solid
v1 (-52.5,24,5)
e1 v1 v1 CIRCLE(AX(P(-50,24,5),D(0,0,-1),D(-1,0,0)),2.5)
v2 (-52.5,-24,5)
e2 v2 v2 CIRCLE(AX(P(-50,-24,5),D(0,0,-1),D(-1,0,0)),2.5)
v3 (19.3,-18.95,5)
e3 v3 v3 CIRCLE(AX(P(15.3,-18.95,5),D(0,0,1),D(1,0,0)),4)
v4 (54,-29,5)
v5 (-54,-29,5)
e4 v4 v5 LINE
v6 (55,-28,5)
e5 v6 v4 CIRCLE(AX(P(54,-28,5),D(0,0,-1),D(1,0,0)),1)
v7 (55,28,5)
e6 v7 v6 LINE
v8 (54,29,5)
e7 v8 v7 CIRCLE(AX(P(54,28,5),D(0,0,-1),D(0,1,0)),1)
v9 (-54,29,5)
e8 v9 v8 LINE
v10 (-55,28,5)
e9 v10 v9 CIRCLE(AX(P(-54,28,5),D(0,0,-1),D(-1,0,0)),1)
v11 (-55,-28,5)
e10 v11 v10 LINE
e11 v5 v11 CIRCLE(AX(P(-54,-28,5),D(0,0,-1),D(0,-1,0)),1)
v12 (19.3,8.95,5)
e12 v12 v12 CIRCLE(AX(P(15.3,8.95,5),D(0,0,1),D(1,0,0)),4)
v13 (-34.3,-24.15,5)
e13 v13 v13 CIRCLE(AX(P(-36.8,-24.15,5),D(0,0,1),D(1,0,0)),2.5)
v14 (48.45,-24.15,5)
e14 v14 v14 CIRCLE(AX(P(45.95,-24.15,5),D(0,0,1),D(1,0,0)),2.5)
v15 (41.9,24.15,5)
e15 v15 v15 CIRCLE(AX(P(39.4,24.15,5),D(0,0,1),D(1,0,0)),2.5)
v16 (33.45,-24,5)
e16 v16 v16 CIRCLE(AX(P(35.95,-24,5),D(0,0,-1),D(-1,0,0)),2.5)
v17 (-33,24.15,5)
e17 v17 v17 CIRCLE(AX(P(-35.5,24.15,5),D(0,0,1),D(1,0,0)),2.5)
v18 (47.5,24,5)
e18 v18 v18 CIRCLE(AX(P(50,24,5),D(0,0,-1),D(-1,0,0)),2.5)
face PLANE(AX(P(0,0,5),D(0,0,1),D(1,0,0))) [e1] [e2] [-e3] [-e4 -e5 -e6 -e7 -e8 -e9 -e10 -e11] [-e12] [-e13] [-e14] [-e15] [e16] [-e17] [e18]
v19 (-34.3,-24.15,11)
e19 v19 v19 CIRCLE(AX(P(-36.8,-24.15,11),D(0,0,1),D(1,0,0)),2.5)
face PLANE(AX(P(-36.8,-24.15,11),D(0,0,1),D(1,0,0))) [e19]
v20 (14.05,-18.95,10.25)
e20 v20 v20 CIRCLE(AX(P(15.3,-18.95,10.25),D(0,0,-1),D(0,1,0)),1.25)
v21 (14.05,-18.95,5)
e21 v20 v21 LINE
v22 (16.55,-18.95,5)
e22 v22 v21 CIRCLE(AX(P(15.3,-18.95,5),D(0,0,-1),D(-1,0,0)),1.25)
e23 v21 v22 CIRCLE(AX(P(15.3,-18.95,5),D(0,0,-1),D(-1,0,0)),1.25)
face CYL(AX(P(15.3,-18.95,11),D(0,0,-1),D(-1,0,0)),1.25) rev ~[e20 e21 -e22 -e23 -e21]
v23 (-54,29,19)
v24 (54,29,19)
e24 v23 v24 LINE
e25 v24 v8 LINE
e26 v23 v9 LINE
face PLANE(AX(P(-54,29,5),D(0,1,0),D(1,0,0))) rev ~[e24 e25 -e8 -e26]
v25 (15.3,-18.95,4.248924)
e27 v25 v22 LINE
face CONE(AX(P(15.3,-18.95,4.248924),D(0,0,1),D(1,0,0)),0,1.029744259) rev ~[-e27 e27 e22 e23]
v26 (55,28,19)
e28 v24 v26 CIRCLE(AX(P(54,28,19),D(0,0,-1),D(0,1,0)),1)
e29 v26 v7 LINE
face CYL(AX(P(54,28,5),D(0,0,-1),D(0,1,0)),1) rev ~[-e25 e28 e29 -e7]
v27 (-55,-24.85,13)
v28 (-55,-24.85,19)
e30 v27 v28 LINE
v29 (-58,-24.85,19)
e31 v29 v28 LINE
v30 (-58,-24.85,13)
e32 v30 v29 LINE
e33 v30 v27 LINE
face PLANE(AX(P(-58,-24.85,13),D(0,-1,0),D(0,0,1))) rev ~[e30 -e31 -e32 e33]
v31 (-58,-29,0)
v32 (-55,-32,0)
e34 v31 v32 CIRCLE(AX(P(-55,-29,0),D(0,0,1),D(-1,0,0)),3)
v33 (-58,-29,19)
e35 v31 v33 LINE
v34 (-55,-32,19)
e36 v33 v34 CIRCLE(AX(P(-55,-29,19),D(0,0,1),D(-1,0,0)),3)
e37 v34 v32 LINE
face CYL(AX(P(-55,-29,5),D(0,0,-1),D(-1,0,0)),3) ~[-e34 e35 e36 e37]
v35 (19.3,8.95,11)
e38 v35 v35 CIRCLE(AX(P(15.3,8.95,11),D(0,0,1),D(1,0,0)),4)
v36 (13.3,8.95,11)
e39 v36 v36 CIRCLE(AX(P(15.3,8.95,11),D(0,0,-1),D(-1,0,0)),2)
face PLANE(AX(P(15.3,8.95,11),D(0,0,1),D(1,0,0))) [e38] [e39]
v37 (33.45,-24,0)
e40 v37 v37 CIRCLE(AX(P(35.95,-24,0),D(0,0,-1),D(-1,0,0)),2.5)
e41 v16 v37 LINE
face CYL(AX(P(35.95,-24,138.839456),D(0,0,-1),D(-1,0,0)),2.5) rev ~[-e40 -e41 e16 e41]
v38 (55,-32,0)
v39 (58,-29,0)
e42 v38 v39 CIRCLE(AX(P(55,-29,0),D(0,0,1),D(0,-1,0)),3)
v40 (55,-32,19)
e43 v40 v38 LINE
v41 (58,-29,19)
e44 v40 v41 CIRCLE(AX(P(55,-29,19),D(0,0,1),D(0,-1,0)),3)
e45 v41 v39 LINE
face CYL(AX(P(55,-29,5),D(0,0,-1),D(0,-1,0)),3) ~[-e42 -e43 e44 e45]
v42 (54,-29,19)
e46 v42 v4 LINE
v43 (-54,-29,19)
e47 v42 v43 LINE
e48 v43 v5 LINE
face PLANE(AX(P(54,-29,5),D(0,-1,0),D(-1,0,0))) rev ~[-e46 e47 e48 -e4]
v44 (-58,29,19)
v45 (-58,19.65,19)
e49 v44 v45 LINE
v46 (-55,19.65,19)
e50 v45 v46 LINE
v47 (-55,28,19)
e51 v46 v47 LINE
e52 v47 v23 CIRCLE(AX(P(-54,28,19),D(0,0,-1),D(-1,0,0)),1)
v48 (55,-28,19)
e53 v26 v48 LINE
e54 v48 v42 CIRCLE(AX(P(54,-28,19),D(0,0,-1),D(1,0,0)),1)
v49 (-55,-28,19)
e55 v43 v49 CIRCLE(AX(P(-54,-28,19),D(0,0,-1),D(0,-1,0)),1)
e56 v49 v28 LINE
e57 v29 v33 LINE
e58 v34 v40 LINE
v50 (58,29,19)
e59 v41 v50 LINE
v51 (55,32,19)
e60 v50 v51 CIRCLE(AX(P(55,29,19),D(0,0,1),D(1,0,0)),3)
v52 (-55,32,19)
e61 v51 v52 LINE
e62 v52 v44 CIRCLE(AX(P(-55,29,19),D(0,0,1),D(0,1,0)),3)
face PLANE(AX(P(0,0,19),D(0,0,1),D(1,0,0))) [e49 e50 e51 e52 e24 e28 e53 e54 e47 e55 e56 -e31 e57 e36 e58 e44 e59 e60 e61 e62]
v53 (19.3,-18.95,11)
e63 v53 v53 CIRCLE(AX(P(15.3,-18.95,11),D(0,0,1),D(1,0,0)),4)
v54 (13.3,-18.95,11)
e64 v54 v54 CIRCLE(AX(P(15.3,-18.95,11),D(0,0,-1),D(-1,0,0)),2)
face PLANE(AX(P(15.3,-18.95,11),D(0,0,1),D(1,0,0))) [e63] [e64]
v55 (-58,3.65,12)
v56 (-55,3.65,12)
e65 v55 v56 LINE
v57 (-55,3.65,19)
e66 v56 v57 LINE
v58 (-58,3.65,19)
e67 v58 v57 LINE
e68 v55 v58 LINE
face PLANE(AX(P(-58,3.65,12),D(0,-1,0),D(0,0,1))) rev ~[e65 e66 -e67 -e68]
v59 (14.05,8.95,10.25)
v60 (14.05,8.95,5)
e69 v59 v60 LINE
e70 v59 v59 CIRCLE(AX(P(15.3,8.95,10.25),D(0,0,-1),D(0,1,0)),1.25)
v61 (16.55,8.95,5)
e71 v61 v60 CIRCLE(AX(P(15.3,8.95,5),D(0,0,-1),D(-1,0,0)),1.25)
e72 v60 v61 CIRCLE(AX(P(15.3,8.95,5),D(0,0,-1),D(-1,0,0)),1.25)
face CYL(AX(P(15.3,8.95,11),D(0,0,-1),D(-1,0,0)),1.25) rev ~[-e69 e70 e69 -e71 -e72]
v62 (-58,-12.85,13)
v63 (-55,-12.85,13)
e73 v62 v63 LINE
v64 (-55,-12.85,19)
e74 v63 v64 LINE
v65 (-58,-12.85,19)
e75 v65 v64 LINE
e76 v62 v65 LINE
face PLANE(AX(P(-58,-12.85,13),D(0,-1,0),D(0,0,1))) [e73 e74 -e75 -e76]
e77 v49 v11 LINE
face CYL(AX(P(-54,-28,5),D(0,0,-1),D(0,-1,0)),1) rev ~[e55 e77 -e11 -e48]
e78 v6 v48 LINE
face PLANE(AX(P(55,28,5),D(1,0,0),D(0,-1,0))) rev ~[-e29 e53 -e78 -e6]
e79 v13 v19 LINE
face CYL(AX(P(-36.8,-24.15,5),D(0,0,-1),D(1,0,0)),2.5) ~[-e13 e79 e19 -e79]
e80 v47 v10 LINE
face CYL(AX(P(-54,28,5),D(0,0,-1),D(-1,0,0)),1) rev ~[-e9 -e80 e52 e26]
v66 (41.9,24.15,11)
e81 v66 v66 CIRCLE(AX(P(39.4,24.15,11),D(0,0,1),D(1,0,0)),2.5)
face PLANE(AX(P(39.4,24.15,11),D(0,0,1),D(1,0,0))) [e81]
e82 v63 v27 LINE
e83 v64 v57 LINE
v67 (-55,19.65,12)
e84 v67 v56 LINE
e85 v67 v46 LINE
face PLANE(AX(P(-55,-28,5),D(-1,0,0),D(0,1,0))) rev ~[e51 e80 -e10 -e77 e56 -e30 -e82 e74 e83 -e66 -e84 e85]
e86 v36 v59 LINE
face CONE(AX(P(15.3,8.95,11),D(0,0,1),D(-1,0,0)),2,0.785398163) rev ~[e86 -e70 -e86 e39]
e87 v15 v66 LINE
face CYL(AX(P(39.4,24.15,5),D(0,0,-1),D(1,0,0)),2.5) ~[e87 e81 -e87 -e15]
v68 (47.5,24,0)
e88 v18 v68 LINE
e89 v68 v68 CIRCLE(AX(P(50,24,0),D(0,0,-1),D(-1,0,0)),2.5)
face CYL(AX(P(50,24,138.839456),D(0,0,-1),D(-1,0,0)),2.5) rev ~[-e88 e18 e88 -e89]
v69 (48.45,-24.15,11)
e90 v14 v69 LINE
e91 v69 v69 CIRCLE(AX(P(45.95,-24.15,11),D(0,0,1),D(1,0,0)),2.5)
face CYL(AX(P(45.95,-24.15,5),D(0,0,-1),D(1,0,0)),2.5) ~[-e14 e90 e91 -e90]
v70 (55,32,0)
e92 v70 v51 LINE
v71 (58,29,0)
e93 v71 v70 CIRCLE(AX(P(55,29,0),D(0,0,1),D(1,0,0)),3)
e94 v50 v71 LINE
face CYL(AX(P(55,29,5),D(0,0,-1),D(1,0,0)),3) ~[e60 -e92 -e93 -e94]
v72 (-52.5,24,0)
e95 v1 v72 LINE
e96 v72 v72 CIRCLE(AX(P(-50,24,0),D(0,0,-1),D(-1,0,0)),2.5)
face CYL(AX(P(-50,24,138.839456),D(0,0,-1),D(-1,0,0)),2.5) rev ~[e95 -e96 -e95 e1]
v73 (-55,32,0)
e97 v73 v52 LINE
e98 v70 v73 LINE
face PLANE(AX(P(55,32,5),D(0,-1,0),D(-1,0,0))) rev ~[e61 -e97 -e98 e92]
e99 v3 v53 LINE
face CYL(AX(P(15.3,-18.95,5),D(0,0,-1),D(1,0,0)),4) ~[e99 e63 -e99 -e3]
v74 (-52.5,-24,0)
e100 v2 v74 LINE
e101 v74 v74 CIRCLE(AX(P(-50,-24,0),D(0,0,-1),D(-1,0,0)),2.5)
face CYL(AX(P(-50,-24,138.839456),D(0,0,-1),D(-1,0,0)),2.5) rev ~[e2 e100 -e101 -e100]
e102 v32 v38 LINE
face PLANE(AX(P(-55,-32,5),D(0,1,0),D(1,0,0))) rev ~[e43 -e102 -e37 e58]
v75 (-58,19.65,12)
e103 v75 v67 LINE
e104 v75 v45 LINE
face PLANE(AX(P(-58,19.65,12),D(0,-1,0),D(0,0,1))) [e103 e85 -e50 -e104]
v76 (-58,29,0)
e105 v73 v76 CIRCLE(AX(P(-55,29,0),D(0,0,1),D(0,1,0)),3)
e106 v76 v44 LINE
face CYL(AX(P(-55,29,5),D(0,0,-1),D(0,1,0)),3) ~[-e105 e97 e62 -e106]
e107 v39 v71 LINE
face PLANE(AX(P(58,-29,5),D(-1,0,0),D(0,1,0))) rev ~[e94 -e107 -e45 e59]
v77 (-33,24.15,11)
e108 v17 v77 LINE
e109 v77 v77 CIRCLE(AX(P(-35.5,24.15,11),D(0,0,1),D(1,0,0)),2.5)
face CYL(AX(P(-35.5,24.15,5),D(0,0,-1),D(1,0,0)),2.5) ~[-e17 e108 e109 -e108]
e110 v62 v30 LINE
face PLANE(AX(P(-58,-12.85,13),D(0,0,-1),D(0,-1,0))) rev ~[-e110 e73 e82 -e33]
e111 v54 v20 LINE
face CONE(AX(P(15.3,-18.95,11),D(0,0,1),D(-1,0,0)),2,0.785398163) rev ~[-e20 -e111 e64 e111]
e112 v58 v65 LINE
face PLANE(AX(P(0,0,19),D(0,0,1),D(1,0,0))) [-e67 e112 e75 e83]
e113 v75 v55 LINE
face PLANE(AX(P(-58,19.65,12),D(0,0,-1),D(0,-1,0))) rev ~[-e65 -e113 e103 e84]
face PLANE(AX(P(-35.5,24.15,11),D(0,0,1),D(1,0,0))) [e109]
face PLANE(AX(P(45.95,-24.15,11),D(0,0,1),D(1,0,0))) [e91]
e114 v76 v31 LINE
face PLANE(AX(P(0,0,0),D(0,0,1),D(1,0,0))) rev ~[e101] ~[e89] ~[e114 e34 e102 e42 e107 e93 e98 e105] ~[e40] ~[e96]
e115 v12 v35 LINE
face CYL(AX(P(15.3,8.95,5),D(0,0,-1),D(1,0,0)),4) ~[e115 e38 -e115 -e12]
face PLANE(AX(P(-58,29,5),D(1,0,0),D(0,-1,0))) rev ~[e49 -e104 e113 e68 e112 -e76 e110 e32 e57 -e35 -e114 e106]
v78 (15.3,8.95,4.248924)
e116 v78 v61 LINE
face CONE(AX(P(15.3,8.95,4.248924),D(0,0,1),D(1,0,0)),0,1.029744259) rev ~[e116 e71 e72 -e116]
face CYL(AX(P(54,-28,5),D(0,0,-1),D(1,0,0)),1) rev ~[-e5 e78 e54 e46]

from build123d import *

# Parameters (mm, degrees)
F2_DEPTH       = 5
F4_DEPTH       = 14
F3_R           = 2.5
F3_R_2         = 4
F5_DEPTH       = 6
F7_D           = 2.5
F7_DEPTH       = 6
F7_CSINK_D     = 4
F7_CSINK_ANGLE = 90
F7_TIP         = 0.7510757738
F8_D           = 5
F9_W           = 16
F9_H           = 7
F9_W_2         = 12
F9_H_2         = 6
F10_DEPTH      = 3


# Not quite as in the source:
# - a feature names something its author has since deleted; it is built from what else it names


with BuildPart() as f2:
    # F1 (on Top) → F2 (new body)
    with BuildSketch(Plane.XY):
        with BuildLine():
            ThreePointArc((58, 29), (57.1213203436, 31.1213203436), (55, 32))
            Line((55, 32), (-55, 32))
            ThreePointArc((-55, 32), (-57.1213203436, 31.1213203436), (-58, 29))
            Line((-58, 29), (-58, -29))
            ThreePointArc((-58, -29), (-57.1213203436, -31.1213203436), (-55, -32))
            Line((-55, -32), (55, -32))
            ThreePointArc((55, -32), (57.1213203436, -31.1213203436), (58, -29))
            Line((58, -29), (58, 29))
        make_face()
        with BuildLine():
            ThreePointArc((55, -28), (54.7071067812, -28.7071067812), (54, -29))
            Line((54, -29), (-54, -29))
            ThreePointArc((-54, -29), (-54.7071067812, -28.7071067812), (-55, -28))
            Line((-55, -28), (-55, 28))
            ThreePointArc((-55, 28), (-54.7071067812, 28.7071067812), (-54, 29))
            Line((-54, 29), (54, 29))
            ThreePointArc((54, 29), (54.7071067812, 28.7071067812), (55, 28))
            Line((55, 28), (55, -28))
        make_face(mode=Mode.SUBTRACT)
        with BuildLine():
            Line((-54, -29), (54, -29))
            ThreePointArc((54, -29), (54.7071067812, -28.7071067812), (55, -28))
            Line((55, -28), (55, 28))
            ThreePointArc((55, 28), (54.7071067812, 28.7071067812), (54, 29))
            Line((54, 29), (-54, 29))
            ThreePointArc((-54, 29), (-54.7071067812, 28.7071067812), (-55, 28))
            Line((-55, 28), (-55, -28))
            ThreePointArc((-55, -28), (-54.7071067812, -28.7071067812), (-54, -29))
        make_face()
    extrude(amount=F2_DEPTH)

    # F3 (on face) → F4 (join)
    with BuildSketch(Plane.XY.offset(5)):
        with BuildLine():
            ThreePointArc((58, 29), (57.1213203436, 31.1213203436), (55, 32))
            Line((55, 32), (-55, 32))
            ThreePointArc((-55, 32), (-57.1213203436, 31.1213203436), (-58, 29))
            Line((-58, 29), (-58, -29))
            ThreePointArc((-58, -29), (-57.1213203436, -31.1213203436), (-55, -32))
            Line((-55, -32), (55, -32))
            ThreePointArc((55, -32), (57.1213203436, -31.1213203436), (58, -29))
            Line((58, -29), (58, 29))
        make_face()
        with BuildLine():
            ThreePointArc((55, -28), (54.7071067812, -28.7071067812), (54, -29))
            Line((54, -29), (-54, -29))
            ThreePointArc((-54, -29), (-54.7071067812, -28.7071067812), (-55, -28))
            Line((-55, -28), (-55, 28))
            ThreePointArc((-55, 28), (-54.7071067812, 28.7071067812), (-54, 29))
            Line((-54, 29), (54, 29))
            ThreePointArc((54, 29), (54.7071067812, 28.7071067812), (55, 28))
            Line((55, 28), (55, -28))
        make_face(mode=Mode.SUBTRACT)
    extrude(amount=F4_DEPTH)

    # F3 (on face) → F5 (join)
    with BuildSketch(Plane.XY.offset(5)):
        with BuildLine():
            ThreePointArc((58, 29), (57.1213203436, 31.1213203436), (55, 32))
            Line((55, 32), (-55, 32))
            ThreePointArc((-55, 32), (-57.1213203436, 31.1213203436), (-58, 29))
            Line((-58, 29), (-58, -29))
            ThreePointArc((-58, -29), (-57.1213203436, -31.1213203436), (-55, -32))
            Line((-55, -32), (55, -32))
            ThreePointArc((55, -32), (57.1213203436, -31.1213203436), (58, -29))
            Line((58, -29), (58, 29))
        make_face()
        with BuildLine():
            ThreePointArc((55, -28), (54.7071067812, -28.7071067812), (54, -29))
            Line((54, -29), (-54, -29))
            ThreePointArc((-54, -29), (-54.7071067812, -28.7071067812), (-55, -28))
            Line((-55, -28), (-55, 28))
            ThreePointArc((-55, 28), (-54.7071067812, 28.7071067812), (-54, 29))
            Line((-54, 29), (54, 29))
            ThreePointArc((54, 29), (54.7071067812, 28.7071067812), (55, 28))
            Line((55, 28), (55, -28))
        make_face(mode=Mode.SUBTRACT)
        with Locations((-35.5, 24.15)):
            Circle(F3_R)
        with Locations((-36.8, -24.15)):
            Circle(F3_R)
        with Locations((15.3, 8.95)):
            Circle(F3_R_2)
        with Locations((15.3, -18.95)):
            Circle(F3_R_2)
        with Locations((45.95, -24.15)):
            Circle(F3_R)
        with Locations((39.4, 24.15)):
            Circle(F3_R)
    extrude(amount=F5_DEPTH)

    # F7
    with Locations(Plane.XY.offset(11)):
        with Locations((15.3, 8.95), (15.3, -18.95)):
            CounterSinkHole(F7_D / 2, F7_CSINK_D / 2, depth=F7_DEPTH, counter_sink_angle=F7_CSINK_ANGLE)
            with Locations((0, 0, -(F7_DEPTH + F7_TIP / 2))):  # 118° drill point
                Cone(0, F7_D / 2, F7_TIP, mode=Mode.SUBTRACT)

    # F8 (through all)
    with Locations(Plane.XY.offset(5)):
        with Locations((-50, 24), (50, 24), (35.95, -24), (-50, -24)):
            Hole(F8_D / 2)

    # F9 (on face) → F10 (cut, through all)
    with BuildSketch(Plane(origin=(-58, 0, 0), x_dir=(0, -1, 0), z_dir=(-1, 0, 0))):
        with Locations((-11.65, 15.5)):
            Rectangle(F9_W, F9_H)
        with Locations((18.85, 16)):
            Rectangle(F9_W_2, F9_H_2)
    extrude(amount=-F10_DEPTH, mode=Mode.SUBTRACT)


solid = f2.part
